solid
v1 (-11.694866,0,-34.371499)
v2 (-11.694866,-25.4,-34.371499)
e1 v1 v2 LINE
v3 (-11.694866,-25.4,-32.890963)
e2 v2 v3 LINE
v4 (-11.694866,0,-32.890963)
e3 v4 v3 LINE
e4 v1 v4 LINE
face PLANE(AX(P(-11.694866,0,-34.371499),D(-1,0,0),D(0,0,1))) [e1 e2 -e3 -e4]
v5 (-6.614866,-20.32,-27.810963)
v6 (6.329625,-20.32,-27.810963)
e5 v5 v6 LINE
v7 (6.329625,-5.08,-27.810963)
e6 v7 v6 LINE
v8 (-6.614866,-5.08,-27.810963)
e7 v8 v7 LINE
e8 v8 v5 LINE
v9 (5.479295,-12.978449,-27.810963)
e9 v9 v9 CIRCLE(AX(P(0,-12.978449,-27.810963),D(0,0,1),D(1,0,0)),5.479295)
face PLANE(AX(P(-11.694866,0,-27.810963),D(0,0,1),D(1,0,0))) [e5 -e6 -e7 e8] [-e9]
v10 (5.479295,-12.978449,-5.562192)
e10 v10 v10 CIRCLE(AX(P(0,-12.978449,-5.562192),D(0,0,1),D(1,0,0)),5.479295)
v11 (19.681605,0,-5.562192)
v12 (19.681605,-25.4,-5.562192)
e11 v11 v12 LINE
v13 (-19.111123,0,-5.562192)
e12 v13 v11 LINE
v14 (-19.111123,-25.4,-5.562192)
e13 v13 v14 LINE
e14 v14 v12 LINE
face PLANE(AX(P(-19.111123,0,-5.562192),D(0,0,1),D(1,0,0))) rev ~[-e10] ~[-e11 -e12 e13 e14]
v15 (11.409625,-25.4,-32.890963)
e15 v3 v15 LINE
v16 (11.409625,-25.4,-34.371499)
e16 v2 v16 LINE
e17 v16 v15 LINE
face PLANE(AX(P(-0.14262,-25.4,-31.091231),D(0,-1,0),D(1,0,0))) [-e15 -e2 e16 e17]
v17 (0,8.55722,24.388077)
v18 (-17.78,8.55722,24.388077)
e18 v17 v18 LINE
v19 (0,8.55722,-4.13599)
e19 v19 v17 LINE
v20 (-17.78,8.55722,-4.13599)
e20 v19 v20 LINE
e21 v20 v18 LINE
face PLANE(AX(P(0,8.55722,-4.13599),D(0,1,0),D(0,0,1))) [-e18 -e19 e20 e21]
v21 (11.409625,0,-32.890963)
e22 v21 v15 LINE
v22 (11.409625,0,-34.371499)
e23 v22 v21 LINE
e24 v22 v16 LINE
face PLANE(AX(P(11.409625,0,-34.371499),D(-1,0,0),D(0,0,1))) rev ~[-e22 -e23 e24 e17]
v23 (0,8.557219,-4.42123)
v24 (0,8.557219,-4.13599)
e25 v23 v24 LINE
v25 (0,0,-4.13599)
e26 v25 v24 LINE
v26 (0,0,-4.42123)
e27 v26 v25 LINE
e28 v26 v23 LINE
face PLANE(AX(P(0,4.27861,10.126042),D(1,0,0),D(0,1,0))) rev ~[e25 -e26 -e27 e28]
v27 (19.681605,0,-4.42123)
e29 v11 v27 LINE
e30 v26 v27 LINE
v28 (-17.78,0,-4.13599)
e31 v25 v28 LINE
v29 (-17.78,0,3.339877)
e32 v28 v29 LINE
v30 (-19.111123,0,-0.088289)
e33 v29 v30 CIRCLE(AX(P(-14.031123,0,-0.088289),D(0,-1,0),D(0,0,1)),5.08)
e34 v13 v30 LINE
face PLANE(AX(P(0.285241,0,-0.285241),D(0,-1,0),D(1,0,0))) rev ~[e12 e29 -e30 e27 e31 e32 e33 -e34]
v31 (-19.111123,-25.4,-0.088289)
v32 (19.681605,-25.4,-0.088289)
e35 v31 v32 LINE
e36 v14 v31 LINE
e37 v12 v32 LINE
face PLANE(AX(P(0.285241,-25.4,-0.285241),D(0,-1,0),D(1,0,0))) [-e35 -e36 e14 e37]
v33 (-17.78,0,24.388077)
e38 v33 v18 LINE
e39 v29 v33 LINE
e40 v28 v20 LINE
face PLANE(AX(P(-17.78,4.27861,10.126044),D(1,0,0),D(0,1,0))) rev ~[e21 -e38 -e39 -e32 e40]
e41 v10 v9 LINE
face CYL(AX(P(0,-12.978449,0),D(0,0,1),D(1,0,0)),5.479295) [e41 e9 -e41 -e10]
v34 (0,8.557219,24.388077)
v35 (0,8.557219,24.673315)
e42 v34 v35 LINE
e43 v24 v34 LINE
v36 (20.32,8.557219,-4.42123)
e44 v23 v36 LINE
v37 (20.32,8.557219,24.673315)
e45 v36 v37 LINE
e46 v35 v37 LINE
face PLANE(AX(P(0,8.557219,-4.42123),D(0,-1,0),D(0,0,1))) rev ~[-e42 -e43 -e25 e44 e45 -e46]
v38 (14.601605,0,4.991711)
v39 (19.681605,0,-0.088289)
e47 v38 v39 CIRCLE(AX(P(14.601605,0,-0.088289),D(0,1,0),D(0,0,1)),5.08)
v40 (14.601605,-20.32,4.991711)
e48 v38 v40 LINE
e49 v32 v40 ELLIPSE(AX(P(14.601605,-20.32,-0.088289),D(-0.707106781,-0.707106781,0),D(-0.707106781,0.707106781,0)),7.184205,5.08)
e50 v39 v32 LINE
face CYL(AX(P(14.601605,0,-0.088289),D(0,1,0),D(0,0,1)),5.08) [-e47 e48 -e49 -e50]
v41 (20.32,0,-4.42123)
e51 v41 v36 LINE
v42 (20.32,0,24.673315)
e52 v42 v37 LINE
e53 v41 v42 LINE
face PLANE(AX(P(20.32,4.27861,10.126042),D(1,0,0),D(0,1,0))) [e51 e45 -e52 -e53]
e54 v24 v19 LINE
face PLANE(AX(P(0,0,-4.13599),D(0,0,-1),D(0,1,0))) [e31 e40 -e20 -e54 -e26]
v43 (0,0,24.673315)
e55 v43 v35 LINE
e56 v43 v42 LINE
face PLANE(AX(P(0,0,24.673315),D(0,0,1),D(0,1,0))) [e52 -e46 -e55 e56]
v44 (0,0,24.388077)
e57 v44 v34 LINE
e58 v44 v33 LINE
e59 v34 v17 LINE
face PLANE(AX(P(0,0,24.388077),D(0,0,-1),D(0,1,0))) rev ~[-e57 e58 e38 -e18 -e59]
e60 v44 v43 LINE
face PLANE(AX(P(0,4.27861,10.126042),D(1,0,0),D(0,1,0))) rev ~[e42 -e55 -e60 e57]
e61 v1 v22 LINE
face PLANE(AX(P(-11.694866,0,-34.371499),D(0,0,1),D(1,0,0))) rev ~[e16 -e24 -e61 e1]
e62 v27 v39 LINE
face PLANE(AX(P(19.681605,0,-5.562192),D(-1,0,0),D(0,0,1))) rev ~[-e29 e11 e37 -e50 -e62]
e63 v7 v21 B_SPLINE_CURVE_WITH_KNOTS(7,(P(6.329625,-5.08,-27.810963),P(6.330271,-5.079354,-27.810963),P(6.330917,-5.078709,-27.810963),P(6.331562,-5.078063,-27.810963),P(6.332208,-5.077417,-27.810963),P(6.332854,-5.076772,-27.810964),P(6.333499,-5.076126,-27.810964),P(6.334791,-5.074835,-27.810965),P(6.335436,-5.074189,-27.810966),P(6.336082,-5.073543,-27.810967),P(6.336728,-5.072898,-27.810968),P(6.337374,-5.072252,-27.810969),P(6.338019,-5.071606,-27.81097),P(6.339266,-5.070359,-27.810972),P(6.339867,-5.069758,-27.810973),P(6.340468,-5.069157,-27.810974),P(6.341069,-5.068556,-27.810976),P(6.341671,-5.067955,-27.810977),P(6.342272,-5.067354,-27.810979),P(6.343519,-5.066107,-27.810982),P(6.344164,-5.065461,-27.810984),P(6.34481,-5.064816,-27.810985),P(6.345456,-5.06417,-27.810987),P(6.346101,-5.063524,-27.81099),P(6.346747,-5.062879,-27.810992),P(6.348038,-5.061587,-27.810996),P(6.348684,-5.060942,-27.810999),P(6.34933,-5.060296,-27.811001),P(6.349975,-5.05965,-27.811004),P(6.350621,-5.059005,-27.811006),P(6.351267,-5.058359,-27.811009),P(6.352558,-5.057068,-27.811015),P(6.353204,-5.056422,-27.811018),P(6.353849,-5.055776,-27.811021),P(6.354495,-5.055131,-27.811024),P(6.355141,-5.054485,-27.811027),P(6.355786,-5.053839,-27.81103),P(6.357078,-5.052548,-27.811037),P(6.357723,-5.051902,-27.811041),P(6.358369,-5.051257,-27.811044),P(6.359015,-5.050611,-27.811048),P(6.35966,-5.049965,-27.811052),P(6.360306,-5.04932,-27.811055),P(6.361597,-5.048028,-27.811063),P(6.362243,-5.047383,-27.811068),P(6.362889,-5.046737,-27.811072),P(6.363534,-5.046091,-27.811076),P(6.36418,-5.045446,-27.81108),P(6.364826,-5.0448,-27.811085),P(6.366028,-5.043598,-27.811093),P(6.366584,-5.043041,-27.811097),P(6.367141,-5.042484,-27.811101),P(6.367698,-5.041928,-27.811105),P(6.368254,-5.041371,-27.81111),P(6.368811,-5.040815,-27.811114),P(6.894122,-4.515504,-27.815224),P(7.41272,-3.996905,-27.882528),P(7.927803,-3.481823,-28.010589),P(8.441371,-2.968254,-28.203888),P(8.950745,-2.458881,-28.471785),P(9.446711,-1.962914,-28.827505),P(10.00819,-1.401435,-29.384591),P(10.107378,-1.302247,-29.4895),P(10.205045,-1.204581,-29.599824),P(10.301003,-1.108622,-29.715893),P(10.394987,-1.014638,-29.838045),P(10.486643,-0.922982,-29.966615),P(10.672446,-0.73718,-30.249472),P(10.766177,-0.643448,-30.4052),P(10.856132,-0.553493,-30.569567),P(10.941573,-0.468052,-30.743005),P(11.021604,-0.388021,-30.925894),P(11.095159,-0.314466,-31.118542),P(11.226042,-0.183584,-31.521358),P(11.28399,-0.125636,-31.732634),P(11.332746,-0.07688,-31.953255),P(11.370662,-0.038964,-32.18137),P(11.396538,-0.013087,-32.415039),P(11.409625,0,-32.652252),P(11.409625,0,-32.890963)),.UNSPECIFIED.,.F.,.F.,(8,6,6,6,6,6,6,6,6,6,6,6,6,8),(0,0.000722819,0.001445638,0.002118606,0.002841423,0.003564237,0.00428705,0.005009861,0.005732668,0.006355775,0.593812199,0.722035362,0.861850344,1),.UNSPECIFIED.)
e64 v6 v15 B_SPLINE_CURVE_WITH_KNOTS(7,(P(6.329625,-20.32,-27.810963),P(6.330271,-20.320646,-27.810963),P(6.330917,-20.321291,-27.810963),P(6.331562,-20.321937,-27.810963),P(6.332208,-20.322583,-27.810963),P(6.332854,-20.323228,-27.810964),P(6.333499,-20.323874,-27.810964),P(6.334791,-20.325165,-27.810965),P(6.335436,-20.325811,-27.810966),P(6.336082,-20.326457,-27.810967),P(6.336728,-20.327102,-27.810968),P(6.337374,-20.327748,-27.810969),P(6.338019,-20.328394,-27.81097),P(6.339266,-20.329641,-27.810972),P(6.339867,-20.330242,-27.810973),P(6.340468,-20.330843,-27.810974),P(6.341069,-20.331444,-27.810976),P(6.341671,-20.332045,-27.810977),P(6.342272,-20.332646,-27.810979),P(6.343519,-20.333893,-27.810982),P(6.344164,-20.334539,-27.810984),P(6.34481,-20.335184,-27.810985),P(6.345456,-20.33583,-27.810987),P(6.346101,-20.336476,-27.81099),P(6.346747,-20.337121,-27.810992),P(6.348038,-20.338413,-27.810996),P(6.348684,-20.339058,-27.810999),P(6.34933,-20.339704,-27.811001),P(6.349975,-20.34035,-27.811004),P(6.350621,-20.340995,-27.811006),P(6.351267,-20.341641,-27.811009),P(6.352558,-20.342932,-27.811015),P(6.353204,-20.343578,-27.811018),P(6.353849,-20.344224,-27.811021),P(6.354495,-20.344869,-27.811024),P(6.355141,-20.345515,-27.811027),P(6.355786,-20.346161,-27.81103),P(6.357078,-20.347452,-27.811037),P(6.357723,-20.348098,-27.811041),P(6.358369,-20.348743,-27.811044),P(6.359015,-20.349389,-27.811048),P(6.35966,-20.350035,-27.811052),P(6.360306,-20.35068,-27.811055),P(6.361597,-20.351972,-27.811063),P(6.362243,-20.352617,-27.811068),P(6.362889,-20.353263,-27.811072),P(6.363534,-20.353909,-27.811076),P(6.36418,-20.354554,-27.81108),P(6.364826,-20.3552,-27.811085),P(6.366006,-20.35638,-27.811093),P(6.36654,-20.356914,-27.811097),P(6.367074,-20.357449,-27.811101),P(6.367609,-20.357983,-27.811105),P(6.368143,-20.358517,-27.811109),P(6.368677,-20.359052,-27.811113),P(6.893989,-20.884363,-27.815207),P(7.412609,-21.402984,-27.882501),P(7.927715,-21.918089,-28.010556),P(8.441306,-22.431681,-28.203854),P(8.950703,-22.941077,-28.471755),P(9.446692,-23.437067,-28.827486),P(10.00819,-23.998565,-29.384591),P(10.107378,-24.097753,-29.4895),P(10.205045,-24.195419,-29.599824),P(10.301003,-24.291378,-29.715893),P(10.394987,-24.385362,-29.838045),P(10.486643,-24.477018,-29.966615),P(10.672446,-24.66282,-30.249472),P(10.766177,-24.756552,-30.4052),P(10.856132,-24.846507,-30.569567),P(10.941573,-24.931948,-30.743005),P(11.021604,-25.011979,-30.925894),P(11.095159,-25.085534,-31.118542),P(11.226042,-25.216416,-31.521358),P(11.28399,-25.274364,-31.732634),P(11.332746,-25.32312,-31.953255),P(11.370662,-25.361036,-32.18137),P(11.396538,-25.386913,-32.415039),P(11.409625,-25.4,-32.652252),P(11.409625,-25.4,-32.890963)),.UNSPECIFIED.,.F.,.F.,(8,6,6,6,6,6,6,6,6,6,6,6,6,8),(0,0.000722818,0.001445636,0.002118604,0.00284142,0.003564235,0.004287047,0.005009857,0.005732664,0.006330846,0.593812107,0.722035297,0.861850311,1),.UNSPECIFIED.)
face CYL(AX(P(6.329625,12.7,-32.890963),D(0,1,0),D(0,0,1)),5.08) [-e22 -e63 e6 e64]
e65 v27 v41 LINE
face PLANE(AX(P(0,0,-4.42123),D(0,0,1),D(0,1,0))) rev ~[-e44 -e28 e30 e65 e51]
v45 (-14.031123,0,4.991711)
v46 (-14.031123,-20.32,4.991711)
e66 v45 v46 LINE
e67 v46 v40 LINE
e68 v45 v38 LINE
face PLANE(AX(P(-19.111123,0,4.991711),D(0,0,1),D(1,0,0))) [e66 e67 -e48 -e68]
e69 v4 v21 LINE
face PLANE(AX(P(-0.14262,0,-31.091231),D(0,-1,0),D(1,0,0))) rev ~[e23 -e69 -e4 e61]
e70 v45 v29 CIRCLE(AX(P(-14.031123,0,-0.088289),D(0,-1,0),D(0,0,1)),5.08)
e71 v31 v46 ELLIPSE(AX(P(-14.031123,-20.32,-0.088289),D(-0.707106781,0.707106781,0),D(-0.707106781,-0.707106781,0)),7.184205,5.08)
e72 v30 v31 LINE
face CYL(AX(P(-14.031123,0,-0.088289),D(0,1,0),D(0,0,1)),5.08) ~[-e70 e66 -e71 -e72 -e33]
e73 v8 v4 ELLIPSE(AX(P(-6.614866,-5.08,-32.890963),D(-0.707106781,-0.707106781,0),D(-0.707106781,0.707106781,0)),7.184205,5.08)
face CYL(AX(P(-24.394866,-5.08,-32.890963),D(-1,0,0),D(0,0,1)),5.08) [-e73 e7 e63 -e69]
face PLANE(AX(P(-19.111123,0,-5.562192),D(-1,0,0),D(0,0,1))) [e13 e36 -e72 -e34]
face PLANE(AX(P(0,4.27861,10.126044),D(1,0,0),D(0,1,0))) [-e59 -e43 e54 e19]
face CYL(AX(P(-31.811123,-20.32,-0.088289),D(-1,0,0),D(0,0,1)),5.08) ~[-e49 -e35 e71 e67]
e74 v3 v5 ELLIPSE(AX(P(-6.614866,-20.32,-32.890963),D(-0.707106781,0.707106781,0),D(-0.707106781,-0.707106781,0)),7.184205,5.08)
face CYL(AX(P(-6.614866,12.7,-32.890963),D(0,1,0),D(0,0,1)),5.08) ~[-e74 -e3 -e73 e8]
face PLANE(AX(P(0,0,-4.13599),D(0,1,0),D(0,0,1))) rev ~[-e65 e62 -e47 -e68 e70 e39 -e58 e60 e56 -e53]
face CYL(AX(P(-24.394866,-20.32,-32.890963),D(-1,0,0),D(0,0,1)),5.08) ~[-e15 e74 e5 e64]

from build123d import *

# Parameters (mm, degrees)
F0_W         = 38.7927275151
F0_H         = 10.5539034121
F1_DEPTH     = 25.4
F2_W         = 8.5572190583
F2_H         = 29.094544705
F3_DEPTH     = 20.32
F4_W         = 8.5572199896
F4_H         = 28.5240663216
F5_DEPTH     = 17.78
F6_R         = 5.4792946357
F7_DEPTH     = 27.94
F8_W         = 23.1044916436
F8_H         = 6.5605361015
F9_DEPTH     = 25.4
F10_T1_DEPTH = 64.1927275151
F10_T3_DEPTH = 38.1
F10_T5_DEPTH = 48.5044916436
F10_T7_DEPTH = 50.8


# Not quite as in the source:
# - a fillet or chamfer that OpenCascade refuses, or shapes differently, is made with other operations: its cross-section is extruded or revolved along the edge and cut away or added


with BuildPart() as f1:
    # F0 (on Front) → F1 (new body)
    with BuildSketch(Plane.XZ):
        with Locations((0.2852408215, -0.2852405887)):
            Rectangle(F0_W, F0_H)
    extrude(amount=F1_DEPTH)

    # F2 (on Right) → F3 (join)
    with BuildSketch(Plane.YZ):
        with Locations((4.2786095291, 10.1260424126)):
            Rectangle(F2_W, F2_H)
    extrude(amount=F3_DEPTH)

    # F4 (on Right) → F5 (join)
    with BuildSketch(Plane.YZ):
        with Locations((4.2786099948, 10.1260435767)):
            Rectangle(F4_W, F4_H)
    extrude(amount=-F5_DEPTH)

    # F6 (on Top) → F7 (join)
    with BuildSketch(Plane.XY):
        with Locations((0, -12.9784494638)):
            Circle(F6_R)
    extrude(amount=-F7_DEPTH)

    # F8 (on Front) → F9 (join)
    with BuildSketch(Plane.XZ):
        with Locations((-0.1426204108, -31.0912309214)):
            Rectangle(F8_W, F8_H)
    extrude(amount=F9_DEPTH)

    # F10: fillet of radius 5.08 on 7 edges, made by hand

    # F10_s2 → F10_t1 (cut)
    with BuildSketch(Plane.YZ.offset(-31.811122936)):
        with BuildLine():
            ThreePointArc((-20.32, 4.9917111173), (-23.9121024484, 3.5038135658), (-25.4, -0.0882888827))
            Line((-25.4, -0.0882888827), (-25.4, 4.9917111173))
            Line((-25.4, 4.9917111173), (-20.32, 4.9917111173))
        make_face()
    extrude(amount=F10_T1_DEPTH, mode=Mode.SUBTRACT)

    # F10_s4 → F10_t3 (cut)
    with BuildSketch(Plane.XZ):
        with BuildLine():
            ThreePointArc((-14.031122936, 4.9917111173), (-17.6232253844, 3.5038135658), (-19.111122936, -0.0882888827))
            Line((-19.111122936, -0.0882888827), (-19.111122936, 4.9917111173))
            Line((-19.111122936, 4.9917111173), (-14.031122936, 4.9917111173))
        make_face()
        with BuildLine():
            ThreePointArc((14.6016045791, 4.9917111173), (18.1937070275, 3.5038135658), (19.6816045791, -0.0882888827))
            Line((19.6816045791, -0.0882888827), (19.6816045791, 4.9917111173))
            Line((19.6816045791, 4.9917111173), (14.6016045791, 4.9917111173))
        make_face()
    extrude(amount=F10_T3_DEPTH, mode=Mode.SUBTRACT)

    # F10_s6 → F10_t5 (cut)
    with BuildSketch(Plane.YZ.offset(-24.3948662326)):
        with BuildLine():
            ThreePointArc((-20.32, -27.8109628707), (-23.9121024484, -29.2988604223), (-25.4, -32.8909628707))
            Line((-25.4, -32.8909628707), (-25.4, -27.8109628707))
            Line((-25.4, -27.8109628707), (-20.32, -27.8109628707))
        make_face()
        with BuildLine():
            ThreePointArc((-5.08, -27.8109628707), (-1.4878975516, -29.2988604223), (0, -32.8909628707))
            Line((0, -32.8909628707), (0, -27.8109628707))
            Line((0, -27.8109628707), (-5.08, -27.8109628707))
        make_face()
    extrude(amount=F10_T5_DEPTH, mode=Mode.SUBTRACT)

    # F10_s8 → F10_t7 (cut)
    with BuildSketch(Plane.XZ.offset(-12.7)):
        with BuildLine():
            ThreePointArc((6.329625411, -27.8109628707), (9.9217278595, -29.2988604223), (11.409625411, -32.8909628707))
            Line((11.409625411, -32.8909628707), (11.409625411, -27.8109628707))
            Line((11.409625411, -27.8109628707), (6.329625411, -27.8109628707))
        make_face()
        with BuildLine():
            ThreePointArc((-6.6148662326, -27.8109628707), (-10.206968681, -29.2988604223), (-11.6948662326, -32.8909628707))
            Line((-11.6948662326, -32.8909628707), (-11.6948662326, -27.8109628707))
            Line((-11.6948662326, -27.8109628707), (-6.6148662326, -27.8109628707))
        make_face()
    extrude(amount=F10_T7_DEPTH, mode=Mode.SUBTRACT)


solid = f1.part
